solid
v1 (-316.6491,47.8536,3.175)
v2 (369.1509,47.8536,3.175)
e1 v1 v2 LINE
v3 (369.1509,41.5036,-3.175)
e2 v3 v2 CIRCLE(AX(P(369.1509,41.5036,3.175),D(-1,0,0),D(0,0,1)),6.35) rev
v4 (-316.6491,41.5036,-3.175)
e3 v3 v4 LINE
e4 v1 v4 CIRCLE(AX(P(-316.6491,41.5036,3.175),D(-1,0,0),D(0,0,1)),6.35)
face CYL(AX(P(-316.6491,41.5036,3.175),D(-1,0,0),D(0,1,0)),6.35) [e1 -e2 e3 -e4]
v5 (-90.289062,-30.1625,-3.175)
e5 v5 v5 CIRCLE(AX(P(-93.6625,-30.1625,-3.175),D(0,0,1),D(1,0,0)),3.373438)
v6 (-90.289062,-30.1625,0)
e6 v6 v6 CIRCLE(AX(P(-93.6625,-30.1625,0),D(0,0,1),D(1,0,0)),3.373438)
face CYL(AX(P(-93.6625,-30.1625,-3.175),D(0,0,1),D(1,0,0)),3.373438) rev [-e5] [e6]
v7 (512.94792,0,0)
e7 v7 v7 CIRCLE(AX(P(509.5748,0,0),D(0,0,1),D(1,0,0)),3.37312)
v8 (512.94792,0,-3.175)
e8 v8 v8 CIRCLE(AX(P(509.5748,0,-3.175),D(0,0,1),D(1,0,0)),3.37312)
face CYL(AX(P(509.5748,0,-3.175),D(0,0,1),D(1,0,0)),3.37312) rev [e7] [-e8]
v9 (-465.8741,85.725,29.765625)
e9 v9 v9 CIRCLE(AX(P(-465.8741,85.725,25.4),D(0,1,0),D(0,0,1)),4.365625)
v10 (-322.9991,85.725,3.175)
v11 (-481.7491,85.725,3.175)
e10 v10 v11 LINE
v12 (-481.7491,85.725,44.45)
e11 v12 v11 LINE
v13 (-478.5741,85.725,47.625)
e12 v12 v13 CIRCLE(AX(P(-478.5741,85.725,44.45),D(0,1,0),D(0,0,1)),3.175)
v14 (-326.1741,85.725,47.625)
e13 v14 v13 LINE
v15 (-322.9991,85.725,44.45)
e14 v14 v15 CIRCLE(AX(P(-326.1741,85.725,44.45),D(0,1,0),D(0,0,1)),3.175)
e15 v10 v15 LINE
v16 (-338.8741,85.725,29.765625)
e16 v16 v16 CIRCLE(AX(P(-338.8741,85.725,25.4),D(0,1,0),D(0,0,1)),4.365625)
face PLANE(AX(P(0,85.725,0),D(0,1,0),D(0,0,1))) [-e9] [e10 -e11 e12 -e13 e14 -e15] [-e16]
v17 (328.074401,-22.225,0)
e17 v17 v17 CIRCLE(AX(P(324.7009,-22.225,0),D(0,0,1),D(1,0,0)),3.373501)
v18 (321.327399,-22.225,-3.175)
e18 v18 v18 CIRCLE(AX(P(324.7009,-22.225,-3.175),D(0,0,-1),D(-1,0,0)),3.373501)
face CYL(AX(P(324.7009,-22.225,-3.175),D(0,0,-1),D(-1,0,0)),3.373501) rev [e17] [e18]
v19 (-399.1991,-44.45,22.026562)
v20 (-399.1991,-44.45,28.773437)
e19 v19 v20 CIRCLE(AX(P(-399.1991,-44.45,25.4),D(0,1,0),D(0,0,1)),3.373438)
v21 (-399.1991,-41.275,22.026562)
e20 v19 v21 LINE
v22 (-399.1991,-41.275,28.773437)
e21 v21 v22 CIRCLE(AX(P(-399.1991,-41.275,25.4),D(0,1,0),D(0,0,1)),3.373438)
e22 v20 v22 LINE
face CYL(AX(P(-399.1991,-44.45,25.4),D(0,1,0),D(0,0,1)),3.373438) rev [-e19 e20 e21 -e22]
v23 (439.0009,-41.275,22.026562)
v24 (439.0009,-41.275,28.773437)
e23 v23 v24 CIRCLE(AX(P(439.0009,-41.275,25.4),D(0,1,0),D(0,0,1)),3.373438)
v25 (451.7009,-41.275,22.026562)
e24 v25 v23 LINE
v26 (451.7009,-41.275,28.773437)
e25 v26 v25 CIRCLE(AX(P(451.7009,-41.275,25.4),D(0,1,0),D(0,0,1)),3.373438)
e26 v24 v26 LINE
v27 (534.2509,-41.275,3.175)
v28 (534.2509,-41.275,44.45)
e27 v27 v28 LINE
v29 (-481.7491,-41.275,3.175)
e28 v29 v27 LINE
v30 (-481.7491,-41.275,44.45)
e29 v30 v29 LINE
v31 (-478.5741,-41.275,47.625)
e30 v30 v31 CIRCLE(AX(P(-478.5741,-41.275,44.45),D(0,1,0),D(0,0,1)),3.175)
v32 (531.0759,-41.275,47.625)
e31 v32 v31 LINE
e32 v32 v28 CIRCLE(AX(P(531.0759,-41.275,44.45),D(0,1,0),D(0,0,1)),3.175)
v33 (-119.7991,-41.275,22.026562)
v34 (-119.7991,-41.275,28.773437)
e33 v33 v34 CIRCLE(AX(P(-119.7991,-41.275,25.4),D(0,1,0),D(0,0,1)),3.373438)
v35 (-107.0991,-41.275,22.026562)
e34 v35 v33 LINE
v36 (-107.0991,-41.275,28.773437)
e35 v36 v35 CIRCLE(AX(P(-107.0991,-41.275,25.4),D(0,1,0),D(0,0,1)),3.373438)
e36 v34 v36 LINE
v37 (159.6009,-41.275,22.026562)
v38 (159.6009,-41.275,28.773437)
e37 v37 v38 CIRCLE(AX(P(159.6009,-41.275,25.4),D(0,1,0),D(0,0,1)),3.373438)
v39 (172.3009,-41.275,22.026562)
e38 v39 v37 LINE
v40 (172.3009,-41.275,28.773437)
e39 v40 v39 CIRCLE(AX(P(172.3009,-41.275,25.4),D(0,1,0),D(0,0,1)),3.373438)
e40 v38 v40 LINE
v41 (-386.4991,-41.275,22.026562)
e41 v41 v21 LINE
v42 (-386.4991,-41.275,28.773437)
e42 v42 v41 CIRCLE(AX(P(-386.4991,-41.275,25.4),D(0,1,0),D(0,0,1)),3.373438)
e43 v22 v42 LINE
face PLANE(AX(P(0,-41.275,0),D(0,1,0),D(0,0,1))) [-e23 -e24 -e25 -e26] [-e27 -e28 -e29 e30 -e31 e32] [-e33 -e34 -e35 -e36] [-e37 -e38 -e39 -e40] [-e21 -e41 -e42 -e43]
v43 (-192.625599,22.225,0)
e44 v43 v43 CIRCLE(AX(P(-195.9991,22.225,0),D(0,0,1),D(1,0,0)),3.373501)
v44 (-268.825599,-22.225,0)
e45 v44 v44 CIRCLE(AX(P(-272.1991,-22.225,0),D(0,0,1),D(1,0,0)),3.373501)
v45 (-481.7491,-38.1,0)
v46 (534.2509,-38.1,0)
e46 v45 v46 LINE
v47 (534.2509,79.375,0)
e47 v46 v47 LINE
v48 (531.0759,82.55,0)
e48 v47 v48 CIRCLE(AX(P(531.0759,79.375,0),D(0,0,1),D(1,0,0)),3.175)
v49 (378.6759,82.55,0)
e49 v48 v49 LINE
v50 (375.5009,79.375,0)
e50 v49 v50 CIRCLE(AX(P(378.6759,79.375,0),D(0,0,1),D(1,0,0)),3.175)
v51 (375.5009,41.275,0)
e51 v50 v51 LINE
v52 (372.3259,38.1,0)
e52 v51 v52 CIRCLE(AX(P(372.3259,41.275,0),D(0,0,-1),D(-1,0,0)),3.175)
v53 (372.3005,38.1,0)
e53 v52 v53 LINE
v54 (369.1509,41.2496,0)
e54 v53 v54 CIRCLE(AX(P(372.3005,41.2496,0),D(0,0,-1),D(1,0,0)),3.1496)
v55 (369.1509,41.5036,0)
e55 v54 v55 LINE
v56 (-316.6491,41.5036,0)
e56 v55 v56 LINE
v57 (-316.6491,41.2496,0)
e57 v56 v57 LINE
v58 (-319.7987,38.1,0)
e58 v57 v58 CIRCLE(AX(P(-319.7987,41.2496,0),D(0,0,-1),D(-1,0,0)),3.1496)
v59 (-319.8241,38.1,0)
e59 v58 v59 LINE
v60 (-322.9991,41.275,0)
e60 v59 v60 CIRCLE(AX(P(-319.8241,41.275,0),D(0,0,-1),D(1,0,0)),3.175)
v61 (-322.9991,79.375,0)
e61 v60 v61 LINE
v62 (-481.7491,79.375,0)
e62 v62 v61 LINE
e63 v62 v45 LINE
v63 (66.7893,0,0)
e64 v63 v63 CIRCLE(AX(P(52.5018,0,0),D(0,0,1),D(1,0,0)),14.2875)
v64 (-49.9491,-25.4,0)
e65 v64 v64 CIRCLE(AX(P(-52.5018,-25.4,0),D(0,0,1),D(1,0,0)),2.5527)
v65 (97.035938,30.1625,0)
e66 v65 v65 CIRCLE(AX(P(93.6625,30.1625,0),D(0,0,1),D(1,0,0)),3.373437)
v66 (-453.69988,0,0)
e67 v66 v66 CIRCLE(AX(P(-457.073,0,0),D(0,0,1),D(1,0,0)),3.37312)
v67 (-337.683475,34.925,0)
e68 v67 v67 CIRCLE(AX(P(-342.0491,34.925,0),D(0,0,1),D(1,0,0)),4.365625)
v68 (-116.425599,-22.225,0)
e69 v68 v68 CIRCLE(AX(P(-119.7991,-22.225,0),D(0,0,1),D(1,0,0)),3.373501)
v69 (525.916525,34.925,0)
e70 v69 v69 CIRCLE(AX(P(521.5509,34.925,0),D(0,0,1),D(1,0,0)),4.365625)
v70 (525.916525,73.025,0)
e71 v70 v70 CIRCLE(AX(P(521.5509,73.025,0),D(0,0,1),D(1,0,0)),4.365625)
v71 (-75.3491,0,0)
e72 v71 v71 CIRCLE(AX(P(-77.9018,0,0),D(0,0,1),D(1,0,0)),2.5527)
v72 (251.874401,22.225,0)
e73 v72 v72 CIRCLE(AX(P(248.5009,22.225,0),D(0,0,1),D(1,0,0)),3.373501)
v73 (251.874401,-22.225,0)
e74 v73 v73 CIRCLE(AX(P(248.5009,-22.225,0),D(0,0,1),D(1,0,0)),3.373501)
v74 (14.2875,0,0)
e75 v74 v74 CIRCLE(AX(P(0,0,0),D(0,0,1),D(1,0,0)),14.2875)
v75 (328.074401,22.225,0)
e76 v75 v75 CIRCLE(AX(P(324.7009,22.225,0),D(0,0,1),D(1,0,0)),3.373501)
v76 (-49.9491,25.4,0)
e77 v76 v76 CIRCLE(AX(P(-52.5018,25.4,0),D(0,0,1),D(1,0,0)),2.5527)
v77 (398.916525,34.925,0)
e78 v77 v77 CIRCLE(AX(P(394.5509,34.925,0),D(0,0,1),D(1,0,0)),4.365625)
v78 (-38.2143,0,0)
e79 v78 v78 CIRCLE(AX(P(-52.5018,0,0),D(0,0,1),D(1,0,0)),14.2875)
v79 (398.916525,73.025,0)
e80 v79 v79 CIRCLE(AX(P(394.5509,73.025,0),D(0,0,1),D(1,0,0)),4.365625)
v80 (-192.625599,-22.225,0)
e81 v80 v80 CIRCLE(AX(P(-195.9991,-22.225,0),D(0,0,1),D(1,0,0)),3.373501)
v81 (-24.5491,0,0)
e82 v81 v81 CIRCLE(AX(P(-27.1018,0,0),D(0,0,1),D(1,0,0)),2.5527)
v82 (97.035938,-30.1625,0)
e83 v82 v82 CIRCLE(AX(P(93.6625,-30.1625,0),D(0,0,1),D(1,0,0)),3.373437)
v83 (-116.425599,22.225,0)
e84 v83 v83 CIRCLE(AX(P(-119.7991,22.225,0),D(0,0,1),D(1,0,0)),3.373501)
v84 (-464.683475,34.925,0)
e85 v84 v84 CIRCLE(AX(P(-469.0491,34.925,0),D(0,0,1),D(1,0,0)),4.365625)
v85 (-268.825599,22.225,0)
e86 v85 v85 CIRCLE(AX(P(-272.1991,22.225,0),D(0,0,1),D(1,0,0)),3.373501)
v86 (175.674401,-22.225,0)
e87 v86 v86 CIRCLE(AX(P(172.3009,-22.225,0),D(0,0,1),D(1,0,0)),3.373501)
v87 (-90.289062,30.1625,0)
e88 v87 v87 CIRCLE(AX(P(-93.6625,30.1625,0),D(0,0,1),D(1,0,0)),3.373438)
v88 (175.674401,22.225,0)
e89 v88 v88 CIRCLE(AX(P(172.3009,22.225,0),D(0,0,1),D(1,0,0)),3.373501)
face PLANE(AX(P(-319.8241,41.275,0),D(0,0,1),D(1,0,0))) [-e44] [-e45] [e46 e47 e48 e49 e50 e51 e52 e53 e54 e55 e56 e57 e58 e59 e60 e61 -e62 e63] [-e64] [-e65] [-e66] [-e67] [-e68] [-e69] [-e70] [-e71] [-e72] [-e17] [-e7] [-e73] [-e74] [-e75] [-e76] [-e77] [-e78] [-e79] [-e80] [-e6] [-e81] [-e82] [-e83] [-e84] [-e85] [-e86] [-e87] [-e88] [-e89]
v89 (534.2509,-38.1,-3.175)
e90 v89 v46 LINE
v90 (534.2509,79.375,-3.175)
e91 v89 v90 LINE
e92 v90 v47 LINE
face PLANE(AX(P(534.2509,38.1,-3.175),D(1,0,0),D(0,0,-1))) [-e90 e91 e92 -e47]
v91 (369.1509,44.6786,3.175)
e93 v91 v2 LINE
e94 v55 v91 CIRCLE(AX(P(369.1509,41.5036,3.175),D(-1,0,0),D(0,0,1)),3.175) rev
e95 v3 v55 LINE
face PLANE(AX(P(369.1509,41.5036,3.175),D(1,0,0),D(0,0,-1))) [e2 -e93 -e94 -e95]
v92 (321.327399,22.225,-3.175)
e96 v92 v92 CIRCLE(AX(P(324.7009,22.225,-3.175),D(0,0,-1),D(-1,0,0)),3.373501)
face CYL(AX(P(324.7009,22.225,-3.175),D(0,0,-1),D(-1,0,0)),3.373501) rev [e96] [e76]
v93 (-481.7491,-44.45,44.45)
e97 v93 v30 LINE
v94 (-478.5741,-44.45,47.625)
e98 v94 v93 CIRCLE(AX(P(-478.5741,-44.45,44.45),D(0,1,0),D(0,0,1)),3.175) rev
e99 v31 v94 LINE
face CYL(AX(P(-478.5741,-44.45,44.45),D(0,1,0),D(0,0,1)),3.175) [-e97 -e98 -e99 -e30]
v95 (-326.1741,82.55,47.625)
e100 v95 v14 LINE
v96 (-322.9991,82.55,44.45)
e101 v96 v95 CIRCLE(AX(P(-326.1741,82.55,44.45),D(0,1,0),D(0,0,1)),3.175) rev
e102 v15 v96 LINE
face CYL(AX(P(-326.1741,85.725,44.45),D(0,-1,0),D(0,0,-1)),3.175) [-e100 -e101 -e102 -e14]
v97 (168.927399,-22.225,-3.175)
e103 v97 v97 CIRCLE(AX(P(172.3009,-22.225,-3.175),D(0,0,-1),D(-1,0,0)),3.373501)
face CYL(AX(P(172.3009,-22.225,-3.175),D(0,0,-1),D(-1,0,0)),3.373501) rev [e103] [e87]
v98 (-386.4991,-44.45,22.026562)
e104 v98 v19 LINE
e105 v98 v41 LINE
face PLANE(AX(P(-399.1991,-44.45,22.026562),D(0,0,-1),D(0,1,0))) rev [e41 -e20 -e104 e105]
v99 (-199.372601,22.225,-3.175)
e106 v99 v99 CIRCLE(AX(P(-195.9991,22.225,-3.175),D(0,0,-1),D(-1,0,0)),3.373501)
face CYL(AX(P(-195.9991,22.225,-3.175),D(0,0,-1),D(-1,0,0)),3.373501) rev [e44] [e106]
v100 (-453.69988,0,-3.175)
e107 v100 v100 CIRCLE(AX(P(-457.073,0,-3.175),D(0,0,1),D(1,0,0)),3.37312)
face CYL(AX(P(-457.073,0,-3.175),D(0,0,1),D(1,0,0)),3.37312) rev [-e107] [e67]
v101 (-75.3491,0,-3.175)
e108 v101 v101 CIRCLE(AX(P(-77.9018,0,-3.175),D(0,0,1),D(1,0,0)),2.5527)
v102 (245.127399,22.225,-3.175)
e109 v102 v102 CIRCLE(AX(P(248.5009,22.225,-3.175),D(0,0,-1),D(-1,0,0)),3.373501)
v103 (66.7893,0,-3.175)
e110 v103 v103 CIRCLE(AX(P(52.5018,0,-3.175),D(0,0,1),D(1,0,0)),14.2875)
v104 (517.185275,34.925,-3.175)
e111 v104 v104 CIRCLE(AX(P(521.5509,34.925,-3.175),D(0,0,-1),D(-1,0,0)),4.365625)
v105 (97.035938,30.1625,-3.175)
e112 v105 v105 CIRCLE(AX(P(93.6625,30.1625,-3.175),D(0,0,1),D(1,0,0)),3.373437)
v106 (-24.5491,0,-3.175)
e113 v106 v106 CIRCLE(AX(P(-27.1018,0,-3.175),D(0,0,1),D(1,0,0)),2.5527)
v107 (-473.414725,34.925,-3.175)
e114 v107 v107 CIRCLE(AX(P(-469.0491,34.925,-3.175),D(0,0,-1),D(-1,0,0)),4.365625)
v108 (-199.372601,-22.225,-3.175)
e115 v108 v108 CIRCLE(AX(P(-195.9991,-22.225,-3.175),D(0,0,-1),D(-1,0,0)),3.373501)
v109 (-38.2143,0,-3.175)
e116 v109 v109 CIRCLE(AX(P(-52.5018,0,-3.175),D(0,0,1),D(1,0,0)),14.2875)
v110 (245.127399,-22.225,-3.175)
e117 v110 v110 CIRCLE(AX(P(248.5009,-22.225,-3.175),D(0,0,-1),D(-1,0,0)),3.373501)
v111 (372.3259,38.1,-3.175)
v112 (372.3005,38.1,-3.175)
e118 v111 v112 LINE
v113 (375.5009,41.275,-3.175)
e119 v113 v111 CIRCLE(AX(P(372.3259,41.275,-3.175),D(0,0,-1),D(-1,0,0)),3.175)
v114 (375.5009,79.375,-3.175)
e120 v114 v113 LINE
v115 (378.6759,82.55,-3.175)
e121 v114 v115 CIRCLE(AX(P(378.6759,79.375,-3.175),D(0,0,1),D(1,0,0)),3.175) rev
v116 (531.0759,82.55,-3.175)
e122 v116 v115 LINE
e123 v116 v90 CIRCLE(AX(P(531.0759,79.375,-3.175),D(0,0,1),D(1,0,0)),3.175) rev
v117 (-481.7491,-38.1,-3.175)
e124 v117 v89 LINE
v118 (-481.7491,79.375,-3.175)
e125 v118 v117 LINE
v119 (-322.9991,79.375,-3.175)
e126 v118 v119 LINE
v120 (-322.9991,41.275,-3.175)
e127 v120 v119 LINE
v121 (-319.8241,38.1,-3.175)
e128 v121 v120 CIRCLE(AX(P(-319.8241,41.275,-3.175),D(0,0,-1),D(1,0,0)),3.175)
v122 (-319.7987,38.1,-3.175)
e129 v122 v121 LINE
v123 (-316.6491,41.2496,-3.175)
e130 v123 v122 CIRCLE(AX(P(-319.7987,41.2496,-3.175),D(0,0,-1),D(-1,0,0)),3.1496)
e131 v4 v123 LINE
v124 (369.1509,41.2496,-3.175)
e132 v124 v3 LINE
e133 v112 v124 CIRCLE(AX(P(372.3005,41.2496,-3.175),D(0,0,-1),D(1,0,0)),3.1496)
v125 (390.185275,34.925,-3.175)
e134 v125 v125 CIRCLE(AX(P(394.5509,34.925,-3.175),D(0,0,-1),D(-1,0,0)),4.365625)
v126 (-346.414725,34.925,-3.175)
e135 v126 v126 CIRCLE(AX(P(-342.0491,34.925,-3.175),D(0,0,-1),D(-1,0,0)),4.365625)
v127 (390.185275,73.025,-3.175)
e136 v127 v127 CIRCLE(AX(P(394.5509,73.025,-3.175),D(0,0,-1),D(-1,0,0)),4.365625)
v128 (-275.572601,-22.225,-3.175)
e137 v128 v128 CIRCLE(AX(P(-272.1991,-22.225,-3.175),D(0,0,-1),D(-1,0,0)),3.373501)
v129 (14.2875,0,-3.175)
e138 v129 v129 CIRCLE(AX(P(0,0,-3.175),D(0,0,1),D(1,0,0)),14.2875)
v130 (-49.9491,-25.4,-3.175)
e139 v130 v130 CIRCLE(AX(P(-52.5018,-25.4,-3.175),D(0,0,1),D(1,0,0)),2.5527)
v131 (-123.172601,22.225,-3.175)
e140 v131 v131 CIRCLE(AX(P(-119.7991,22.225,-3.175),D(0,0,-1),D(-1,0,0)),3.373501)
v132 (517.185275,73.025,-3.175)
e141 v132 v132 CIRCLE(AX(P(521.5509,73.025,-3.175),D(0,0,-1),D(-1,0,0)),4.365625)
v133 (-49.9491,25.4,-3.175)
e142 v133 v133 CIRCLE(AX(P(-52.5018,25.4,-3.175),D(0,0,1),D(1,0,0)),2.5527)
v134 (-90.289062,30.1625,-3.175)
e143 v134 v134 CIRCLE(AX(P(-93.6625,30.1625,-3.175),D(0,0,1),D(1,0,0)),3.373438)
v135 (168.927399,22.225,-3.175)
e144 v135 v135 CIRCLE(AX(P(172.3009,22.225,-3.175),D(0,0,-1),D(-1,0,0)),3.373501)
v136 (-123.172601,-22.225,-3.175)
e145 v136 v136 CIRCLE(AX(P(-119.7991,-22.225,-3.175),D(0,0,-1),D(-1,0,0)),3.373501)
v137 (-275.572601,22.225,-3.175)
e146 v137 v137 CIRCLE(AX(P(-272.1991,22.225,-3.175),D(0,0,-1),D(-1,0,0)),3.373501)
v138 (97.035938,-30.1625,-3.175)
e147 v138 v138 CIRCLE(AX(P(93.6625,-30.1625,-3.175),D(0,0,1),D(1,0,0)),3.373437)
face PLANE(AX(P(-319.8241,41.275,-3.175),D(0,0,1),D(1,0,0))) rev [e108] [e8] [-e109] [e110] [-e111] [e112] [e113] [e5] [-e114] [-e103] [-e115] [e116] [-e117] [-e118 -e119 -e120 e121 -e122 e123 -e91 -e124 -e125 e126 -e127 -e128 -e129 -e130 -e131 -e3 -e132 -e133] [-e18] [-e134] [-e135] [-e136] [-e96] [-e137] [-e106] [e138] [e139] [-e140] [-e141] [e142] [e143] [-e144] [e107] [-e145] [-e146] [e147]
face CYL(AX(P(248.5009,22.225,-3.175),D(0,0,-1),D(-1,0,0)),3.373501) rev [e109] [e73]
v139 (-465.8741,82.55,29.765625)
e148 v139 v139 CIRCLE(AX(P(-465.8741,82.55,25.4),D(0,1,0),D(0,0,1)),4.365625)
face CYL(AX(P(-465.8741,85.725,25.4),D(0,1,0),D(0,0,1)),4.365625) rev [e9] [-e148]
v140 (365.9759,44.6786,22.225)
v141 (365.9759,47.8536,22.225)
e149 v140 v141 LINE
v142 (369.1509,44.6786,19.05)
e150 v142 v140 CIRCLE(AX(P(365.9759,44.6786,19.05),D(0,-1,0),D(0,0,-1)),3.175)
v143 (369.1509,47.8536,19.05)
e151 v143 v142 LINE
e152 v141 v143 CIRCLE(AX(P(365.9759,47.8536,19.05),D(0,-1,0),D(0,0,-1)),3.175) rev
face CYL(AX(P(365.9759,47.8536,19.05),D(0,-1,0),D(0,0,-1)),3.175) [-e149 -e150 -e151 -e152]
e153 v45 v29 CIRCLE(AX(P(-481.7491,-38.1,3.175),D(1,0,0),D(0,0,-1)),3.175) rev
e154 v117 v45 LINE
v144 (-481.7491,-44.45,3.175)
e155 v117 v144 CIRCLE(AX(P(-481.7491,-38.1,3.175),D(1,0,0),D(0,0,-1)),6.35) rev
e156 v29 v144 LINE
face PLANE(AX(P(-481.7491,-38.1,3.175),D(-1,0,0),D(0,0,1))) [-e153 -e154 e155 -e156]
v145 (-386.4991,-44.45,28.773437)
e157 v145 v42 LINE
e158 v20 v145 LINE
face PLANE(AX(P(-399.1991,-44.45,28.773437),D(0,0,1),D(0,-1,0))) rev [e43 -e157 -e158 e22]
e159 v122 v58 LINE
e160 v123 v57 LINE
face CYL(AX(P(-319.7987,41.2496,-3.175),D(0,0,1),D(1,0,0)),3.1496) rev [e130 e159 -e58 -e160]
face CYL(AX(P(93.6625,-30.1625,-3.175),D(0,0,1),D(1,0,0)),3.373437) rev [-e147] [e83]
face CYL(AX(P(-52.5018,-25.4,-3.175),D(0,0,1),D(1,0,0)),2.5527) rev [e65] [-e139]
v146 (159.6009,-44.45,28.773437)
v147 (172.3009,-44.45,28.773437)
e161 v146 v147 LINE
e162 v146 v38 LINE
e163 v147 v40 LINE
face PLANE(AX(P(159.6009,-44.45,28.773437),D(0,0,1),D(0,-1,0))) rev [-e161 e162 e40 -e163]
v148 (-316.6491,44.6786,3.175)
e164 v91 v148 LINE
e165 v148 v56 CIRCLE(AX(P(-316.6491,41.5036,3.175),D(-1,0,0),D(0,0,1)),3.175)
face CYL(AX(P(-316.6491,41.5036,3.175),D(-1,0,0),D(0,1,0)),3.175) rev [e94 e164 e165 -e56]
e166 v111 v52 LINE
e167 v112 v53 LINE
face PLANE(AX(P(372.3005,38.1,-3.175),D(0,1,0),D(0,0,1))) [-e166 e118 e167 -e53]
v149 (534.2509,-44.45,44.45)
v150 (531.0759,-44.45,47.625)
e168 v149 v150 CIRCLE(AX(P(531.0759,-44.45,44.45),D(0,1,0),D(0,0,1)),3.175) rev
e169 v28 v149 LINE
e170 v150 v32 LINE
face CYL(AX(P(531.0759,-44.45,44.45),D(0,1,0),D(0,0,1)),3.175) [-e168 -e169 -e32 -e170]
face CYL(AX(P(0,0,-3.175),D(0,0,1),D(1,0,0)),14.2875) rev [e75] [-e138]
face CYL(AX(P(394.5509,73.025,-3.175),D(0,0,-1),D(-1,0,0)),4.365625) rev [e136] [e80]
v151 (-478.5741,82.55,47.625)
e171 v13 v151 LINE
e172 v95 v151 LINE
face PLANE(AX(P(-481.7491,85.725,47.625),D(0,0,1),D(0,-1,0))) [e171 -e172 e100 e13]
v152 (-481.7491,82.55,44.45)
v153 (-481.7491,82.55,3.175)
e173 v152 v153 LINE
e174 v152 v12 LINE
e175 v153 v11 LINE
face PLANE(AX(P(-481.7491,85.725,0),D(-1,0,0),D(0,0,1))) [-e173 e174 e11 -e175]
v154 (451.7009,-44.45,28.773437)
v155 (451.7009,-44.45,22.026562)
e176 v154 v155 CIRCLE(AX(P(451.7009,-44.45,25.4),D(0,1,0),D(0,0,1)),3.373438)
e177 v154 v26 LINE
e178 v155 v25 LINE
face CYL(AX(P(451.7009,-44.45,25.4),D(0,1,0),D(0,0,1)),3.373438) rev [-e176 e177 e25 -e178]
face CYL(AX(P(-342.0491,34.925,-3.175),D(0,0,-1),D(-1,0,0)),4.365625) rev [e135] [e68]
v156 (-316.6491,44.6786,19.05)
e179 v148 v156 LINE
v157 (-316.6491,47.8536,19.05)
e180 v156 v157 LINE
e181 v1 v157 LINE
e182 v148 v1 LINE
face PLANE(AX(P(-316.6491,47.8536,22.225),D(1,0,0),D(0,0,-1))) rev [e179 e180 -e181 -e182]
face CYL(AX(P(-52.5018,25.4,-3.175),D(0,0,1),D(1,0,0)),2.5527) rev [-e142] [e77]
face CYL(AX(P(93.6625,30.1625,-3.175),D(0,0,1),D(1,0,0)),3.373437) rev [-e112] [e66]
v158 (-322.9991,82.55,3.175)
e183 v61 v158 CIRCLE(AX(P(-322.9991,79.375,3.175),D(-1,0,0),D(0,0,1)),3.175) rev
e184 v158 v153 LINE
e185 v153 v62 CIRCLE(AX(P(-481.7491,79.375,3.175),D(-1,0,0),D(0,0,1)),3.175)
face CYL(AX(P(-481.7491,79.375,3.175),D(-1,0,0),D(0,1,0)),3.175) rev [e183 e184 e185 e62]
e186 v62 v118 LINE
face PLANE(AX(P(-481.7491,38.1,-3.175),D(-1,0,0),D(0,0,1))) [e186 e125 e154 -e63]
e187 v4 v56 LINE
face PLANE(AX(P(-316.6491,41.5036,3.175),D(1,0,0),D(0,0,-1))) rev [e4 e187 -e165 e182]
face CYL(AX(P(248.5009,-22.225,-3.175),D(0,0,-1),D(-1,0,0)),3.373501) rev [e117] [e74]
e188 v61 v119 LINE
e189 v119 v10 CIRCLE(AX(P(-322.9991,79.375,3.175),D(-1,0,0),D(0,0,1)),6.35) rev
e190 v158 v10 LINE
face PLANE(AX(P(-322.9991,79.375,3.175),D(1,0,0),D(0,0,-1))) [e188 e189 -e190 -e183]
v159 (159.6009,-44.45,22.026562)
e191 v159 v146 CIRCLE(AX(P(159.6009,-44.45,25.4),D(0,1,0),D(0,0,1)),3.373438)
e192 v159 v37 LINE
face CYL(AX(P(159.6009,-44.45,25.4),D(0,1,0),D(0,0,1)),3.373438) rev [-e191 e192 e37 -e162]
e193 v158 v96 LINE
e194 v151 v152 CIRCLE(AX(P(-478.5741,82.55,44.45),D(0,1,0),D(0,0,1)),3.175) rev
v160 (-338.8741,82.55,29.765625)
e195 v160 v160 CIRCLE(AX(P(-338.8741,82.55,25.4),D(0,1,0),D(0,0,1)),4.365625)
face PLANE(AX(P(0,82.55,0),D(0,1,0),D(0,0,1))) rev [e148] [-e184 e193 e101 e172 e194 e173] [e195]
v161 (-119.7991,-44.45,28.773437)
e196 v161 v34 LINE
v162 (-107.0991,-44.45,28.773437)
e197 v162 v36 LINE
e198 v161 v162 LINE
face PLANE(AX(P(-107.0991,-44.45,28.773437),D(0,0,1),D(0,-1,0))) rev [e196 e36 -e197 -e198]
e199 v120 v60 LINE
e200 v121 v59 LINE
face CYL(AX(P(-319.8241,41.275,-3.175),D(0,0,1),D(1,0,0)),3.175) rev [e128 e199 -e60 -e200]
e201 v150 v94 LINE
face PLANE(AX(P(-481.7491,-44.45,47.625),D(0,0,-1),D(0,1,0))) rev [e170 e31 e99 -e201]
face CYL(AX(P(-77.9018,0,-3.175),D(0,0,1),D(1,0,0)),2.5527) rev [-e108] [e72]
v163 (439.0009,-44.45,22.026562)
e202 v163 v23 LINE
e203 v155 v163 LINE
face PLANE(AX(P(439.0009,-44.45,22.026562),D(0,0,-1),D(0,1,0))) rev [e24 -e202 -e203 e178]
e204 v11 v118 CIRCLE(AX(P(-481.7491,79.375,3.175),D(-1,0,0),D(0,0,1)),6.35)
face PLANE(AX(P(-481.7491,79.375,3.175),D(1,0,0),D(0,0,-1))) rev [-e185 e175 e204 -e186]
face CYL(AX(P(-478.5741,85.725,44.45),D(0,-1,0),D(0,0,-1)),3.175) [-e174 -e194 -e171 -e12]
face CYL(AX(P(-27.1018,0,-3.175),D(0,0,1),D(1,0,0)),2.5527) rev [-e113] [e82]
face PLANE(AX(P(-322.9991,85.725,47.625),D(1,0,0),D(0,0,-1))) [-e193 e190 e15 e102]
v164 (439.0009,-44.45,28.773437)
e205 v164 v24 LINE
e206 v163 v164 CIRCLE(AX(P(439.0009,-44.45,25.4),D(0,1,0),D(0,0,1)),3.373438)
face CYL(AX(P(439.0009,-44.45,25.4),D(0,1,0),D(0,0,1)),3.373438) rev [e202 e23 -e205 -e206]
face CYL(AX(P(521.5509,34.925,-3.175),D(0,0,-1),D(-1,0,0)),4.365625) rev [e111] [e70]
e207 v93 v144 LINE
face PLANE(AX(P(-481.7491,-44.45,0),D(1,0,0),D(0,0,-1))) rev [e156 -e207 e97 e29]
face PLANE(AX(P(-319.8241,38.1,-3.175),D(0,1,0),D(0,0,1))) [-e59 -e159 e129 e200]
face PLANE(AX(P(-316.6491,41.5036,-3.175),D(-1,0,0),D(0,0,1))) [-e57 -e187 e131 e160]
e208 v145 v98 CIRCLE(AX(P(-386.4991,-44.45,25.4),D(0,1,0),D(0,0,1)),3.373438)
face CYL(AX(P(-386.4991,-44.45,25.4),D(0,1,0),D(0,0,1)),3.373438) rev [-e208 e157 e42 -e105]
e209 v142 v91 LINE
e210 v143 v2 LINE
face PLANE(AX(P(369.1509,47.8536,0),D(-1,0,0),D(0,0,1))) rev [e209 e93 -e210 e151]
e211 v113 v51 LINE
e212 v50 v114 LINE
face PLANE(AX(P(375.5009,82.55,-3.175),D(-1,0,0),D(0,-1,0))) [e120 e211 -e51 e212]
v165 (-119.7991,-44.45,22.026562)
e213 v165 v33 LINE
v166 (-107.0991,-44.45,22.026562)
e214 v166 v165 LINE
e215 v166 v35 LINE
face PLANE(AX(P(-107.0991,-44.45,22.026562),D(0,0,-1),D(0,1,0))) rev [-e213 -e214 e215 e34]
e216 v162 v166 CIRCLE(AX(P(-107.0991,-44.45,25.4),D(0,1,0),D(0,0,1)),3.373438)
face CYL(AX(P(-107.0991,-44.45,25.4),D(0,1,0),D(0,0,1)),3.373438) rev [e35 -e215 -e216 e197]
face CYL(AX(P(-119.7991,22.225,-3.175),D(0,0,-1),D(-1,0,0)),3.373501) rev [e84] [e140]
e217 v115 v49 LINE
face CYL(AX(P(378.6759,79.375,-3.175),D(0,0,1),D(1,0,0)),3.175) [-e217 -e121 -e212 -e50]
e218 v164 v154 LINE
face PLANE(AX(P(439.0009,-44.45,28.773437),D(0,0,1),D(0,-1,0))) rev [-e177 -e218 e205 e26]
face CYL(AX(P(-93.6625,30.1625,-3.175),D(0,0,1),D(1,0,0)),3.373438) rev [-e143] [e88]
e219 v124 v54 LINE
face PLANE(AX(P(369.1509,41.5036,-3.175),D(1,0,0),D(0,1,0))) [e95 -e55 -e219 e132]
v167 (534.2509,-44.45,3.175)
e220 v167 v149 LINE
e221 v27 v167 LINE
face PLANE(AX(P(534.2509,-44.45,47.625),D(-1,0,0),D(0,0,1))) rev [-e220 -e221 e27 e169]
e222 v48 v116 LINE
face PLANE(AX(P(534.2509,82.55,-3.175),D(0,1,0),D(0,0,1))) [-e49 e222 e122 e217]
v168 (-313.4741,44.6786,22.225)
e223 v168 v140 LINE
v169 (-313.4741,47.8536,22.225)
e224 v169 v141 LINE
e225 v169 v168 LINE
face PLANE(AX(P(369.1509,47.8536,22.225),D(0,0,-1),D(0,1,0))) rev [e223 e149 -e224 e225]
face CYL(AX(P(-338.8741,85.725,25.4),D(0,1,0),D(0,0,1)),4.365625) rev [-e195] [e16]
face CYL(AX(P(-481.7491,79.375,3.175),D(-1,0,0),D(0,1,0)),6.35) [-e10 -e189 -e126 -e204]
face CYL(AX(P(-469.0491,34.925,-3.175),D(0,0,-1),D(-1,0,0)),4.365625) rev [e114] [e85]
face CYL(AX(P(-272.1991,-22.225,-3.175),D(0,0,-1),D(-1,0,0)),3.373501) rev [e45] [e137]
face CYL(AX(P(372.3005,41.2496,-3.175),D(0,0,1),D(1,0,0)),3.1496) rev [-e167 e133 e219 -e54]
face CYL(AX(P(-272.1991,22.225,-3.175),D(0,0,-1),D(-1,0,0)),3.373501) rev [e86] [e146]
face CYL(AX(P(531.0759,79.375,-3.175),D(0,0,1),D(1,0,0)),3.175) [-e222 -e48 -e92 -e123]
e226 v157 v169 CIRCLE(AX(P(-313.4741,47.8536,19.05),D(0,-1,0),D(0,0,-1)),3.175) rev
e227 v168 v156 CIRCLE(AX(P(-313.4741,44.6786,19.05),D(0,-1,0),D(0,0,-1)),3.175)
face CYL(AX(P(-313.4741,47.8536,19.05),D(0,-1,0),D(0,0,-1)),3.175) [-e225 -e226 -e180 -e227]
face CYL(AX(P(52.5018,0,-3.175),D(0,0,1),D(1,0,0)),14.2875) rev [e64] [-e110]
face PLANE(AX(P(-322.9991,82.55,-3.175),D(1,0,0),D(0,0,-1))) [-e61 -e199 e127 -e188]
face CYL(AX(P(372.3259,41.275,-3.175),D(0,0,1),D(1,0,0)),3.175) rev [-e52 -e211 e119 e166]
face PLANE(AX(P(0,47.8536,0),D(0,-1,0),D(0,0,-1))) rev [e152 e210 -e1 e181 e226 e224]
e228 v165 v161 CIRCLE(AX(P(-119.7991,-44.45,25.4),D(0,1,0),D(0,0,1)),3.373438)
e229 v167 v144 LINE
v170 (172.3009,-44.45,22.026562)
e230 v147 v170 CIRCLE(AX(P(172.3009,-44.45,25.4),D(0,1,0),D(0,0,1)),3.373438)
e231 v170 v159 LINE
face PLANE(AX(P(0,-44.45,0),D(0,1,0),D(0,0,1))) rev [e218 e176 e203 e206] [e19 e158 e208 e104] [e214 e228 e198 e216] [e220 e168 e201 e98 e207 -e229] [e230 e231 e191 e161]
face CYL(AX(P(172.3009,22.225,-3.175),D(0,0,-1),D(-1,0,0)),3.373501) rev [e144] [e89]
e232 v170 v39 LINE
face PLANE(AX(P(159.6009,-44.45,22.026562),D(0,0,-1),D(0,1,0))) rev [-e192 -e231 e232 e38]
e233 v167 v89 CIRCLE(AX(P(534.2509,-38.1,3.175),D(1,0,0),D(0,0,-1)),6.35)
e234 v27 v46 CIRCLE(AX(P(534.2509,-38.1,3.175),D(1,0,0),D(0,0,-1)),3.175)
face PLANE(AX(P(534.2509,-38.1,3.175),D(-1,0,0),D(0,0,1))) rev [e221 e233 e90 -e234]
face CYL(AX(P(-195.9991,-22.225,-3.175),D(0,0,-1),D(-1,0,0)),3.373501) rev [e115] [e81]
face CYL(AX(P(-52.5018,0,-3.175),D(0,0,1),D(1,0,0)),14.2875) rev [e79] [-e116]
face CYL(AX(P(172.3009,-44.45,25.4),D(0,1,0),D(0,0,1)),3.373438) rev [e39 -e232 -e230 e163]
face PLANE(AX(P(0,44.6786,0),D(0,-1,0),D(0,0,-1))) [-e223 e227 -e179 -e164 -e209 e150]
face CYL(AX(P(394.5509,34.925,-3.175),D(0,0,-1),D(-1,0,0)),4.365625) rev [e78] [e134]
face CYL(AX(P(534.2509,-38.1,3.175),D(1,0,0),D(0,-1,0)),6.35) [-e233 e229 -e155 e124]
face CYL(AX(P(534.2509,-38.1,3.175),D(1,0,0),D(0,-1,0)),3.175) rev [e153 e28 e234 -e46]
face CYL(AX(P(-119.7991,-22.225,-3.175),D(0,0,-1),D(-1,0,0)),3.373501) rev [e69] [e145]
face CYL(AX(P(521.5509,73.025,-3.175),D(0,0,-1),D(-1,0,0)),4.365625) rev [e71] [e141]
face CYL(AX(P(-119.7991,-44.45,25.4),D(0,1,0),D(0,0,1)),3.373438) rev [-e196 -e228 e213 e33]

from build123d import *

# Parameters (mm, degrees)
SKETCH1_R                            = 3.37312
SKETCH1_R_2                          = 14.2875
SKETCH1_R_3                          = 3.3734375
SKETCH1_R_4                          = 2.5527
BASE_FLANGE1_DEPTH                   = 3.175
EDGE_FLANGE1_DEPTH                   = 1016
EDGE_FLANGE2_DEPTH                   = 685.8
EDGE_FLANGE3_STRIP_W                 = 19.05
EDGE_FLANGE3_STRIP_H                 = 3.175
EDGE_FLANGE3_STRIP_CUT_DEPTH         = 158.75
EDGE_FLANGE3_DEPTH                   = 158.75
FILLET1_R                            = 3.175
F_17_64_0_26563_DIAMETER_HOLE1_D     = 6.747002
F_11_32_0_34375_DIAMETER_HOLE1_D     = 8.73125
F_11_32_0_34375_DIAMETER_HOLE2_D     = 8.73125
F_11_32_0_34375_DIAMETER_HOLE2_DEPTH = 3.175
CUT_EXTRUDE2_DEPTH                   = 552.199750341


# Sheet-metal steps are written as plain solids
with BuildPart() as part:
    # Sketch1 → Base-Flange1 (new body)
    with BuildSketch(Plane.XY):
        with BuildLine():
            Line((-481.7491, 38.1), (-481.7491, 82.55))
            Line((-481.7491, 82.55), (-322.9991, 82.55))
            Line((-322.9991, 82.55), (-322.9991, 41.275))
            ThreePointArc((-322.9991, 41.275), (-322.06916403, 39.02993597), (-319.8241, 38.1))
            Line((-319.8241, 38.1), (-319.7987, 38.1))
            ThreePointArc((-319.7987, 38.1), (-317.571596482, 39.022496482), (-316.6491, 41.2496))
            Line((-316.6491, 41.2496), (-316.6491, 41.5036))
            Line((-316.6491, 41.5036), (369.1509, 41.5036))
            Line((369.1509, 41.5036), (369.1509, 41.2496))
            ThreePointArc((369.1509, 41.2496), (370.073396482, 39.022496482), (372.3005, 38.1))
            Line((372.3005, 38.1), (372.3259, 38.1))
            ThreePointArc((372.3259, 38.1), (374.57096403, 39.02993597), (375.5009, 41.275))
            Line((375.5009, 41.275), (375.5009, 82.55))
            Line((375.5009, 82.55), (534.2509, 82.55))
            Line((534.2509, 82.55), (534.2509, 38.1))
            Line((534.2509, 38.1), (534.2509, -38.1))
            Line((534.2509, -38.1), (-481.7491, -38.1))
            Line((-481.7491, -38.1), (-481.7491, 38.1))
        make_face()
        with Locations((-457.073, 0)):
            Circle(SKETCH1_R, mode=Mode.SUBTRACT)
        Circle(SKETCH1_R_2, mode=Mode.SUBTRACT)
        with Locations((-52.5018, 0)):
            Circle(SKETCH1_R_2, mode=Mode.SUBTRACT)
        with Locations((52.5018, 0)):
            Circle(SKETCH1_R_2, mode=Mode.SUBTRACT)
        with Locations((509.5748, 0)):
            Circle(SKETCH1_R, mode=Mode.SUBTRACT)
        with Locations((-93.6625, 30.1625)):
            Circle(SKETCH1_R_3, mode=Mode.SUBTRACT)
        with Locations((93.6625, 30.1625)):
            Circle(SKETCH1_R_3, mode=Mode.SUBTRACT)
        with Locations((93.6625, -30.1625)):
            Circle(SKETCH1_R_3, mode=Mode.SUBTRACT)
        with Locations((-93.6625, -30.1625)):
            Circle(SKETCH1_R_3, mode=Mode.SUBTRACT)
        with Locations((-27.1018, 0)):
            Circle(SKETCH1_R_4, mode=Mode.SUBTRACT)
        with Locations((-52.5018, 25.4)):
            Circle(SKETCH1_R_4, mode=Mode.SUBTRACT)
        with Locations((-52.5018, -25.4)):
            Circle(SKETCH1_R_4, mode=Mode.SUBTRACT)
        with Locations((-77.9018, 0)):
            Circle(SKETCH1_R_4, mode=Mode.SUBTRACT)
    extrude(amount=-BASE_FLANGE1_DEPTH)

    # Edge-Flange1 section (across the edge) → Edge-Flange1 (add)
    with BuildSketch(Plane(origin=(-481.7491, -41.275, 0), x_dir=(0, 1, 0), z_dir=(1, 0, 0))):
        with BuildLine():
            Line((-3.175, 3.175), (-3.175, 47.625))
            Line((-3.175, 47.625), (0, 47.625))
            Line((0, 47.625), (0, 3.175))
            ThreePointArc((0, 3.175), (0.92993597, 0.92993597), (3.175, 0))
            Line((3.175, 0), (3.175, -3.175))
            ThreePointArc((3.175, -3.175), (-1.315128061, -1.315128061), (-3.175, 3.175))
        make_face()
    extrude(amount=EDGE_FLANGE1_DEPTH)

    # Edge-Flange2 section (across the edge) → Edge-Flange2 (add)
    with BuildSketch(Plane(origin=(369.1509, 44.6786, 0), x_dir=(0, -1, 0), z_dir=(-1, 0, 0))):
        with BuildLine():
            Line((-3.175, 3.175), (-3.175, 22.225))
            Line((-3.175, 22.225), (0, 22.225))
            Line((0, 22.225), (0, 3.175))
            ThreePointArc((0, 3.175), (0.92993597, 0.92993597), (3.175, 0))
            Line((3.175, 0), (3.175, -3.175))
            ThreePointArc((3.175, -3.175), (-1.315128061, -1.315128061), (-3.175, 3.175))
        make_face()
    extrude(amount=EDGE_FLANGE2_DEPTH)

    # Edge-Flange3 strip (across the edge) → Edge-Flange3 strip cut (cut)
    with BuildSketch(Plane(origin=(-322.9991, 82.55, 0), x_dir=(0, -1, 0), z_dir=(-1, 0, 0))):
        with Locations((-6.35, -1.5875)):
            Rectangle(EDGE_FLANGE3_STRIP_W, EDGE_FLANGE3_STRIP_H)
    extrude(amount=EDGE_FLANGE3_STRIP_CUT_DEPTH, mode=Mode.SUBTRACT)

    # Edge-Flange3 section (across the edge) → Edge-Flange3 (add)
    with BuildSketch(Plane(origin=(-322.9991, 82.55, 0), x_dir=(0, -1, 0), z_dir=(-1, 0, 0))):
        with BuildLine():
            Line((-3.175, 3.175), (-3.175, 47.625))
            Line((-3.175, 47.625), (0, 47.625))
            Line((0, 47.625), (0, 3.175))
            ThreePointArc((0, 3.175), (0.92993597, 0.92993597), (3.175, 0))
            Line((3.175, 0), (3.175, -3.175))
            ThreePointArc((3.175, -3.175), (-1.315128061, -1.315128061), (-3.175, 3.175))
        make_face()
    extrude(amount=EDGE_FLANGE3_DEPTH)

    # Fillet1
    fillet1_edges = [part.edges().sort_by_distance(p)[0] for p in [
        (-481.7491, -42.8625, 47.625),
        (534.2509, -42.8625, 47.625),
        (369.1509, 46.2661, 22.225),
        (-316.6491, 46.2661, 22.225),
        (-322.9991, 84.1375, 47.625),
        (-481.7491, 84.1375, 47.625),
        (375.5009, 82.55, -1.5875),
        (534.2509, 82.55, -1.5875),
    ]]
    fillet(fillet1_edges, radius=FILLET1_R)

    # 17/64 (0.26563) Diameter Hole1 (through all)
    with Locations(Plane(origin=(0, 0, -3.175), x_dir=(-1, 0, 0), z_dir=(0, 0, -1))):
        with Locations((-324.7009, -22.225), (-324.7009, 22.225), (-172.3009, 22.225), (-172.3009, -22.225), (119.7991, 22.225), (272.1991, 22.225), (272.1991, -22.225), (119.7991, -22.225), (-248.5009, 22.225), (-248.5009, -22.225), (195.9991, 22.225), (195.9991, -22.225)):
            Hole(F_17_64_0_26563_DIAMETER_HOLE1_D / 2)

    # 11/32 (0.34375) Diameter Hole1 (through all)
    with Locations(Plane(origin=(0, 0, -3.175), x_dir=(-1, 0, 0), z_dir=(0, 0, -1))):
        with Locations((-394.5509, 73.025), (-394.5509, 34.925), (-521.5509, 34.925), (-521.5509, 73.025), (342.0491, 34.925), (469.0491, 34.925)):
            Hole(F_11_32_0_34375_DIAMETER_HOLE1_D / 2)

    # 11/32 (0.34375) Diameter Hole2
    with Locations(Plane(origin=(0, 85.725, 0), x_dir=(1, 0, 0), z_dir=(0, 1, 0))):
        with Locations((-465.8741, -25.4), (-338.8741, -25.4)):
            Hole(F_11_32_0_34375_DIAMETER_HOLE2_D / 2, depth=F_11_32_0_34375_DIAMETER_HOLE2_DEPTH)

    # Sketch34 → Cut-Extrude2 (cut, through all)
    with BuildSketch(Plane(origin=(0, -41.275, 0), x_dir=(1, 0, 0), z_dir=(0, 1, 0))):
        with BuildLine():
            Line((-399.1991, -22.0265625), (-386.4991, -22.0265625))
            ThreePointArc((-386.4991, -22.0265625), (-383.1256625, -25.4), (-386.4991, -28.7734375))
            Line((-386.4991, -28.7734375), (-399.1991, -28.7734375))
            ThreePointArc((-399.1991, -28.7734375), (-402.5725375, -25.4), (-399.1991, -22.0265625))
        make_face()
        with BuildLine():
            Line((-107.0991, -28.7734375), (-119.7991, -28.7734375))
            ThreePointArc((-119.7991, -28.7734375), (-123.1725375, -25.4), (-119.7991, -22.0265625))
            Line((-119.7991, -22.0265625), (-107.0991, -22.0265625))
            ThreePointArc((-107.0991, -22.0265625), (-103.7256625, -25.4), (-107.0991, -28.7734375))
        make_face()
        with BuildLine():
            Line((159.6009, -22.0265625), (172.3009, -22.0265625))
            ThreePointArc((172.3009, -22.0265625), (175.6743375, -25.4), (172.3009, -28.7734375))
            Line((172.3009, -28.7734375), (159.6009, -28.7734375))
            ThreePointArc((159.6009, -28.7734375), (156.2274625, -25.4), (159.6009, -22.0265625))
        make_face()
        with BuildLine():
            Line((439.0009, -22.0265625), (451.7009, -22.0265625))
            ThreePointArc((451.7009, -22.0265625), (455.0743375, -25.4), (451.7009, -28.7734375))
            Line((451.7009, -28.7734375), (439.0009, -28.7734375))
            ThreePointArc((439.0009, -28.7734375), (435.6274625, -25.4), (439.0009, -22.0265625))
        make_face()
    extrude(amount=-CUT_EXTRUDE2_DEPTH, mode=Mode.SUBTRACT)


solid = part.part
